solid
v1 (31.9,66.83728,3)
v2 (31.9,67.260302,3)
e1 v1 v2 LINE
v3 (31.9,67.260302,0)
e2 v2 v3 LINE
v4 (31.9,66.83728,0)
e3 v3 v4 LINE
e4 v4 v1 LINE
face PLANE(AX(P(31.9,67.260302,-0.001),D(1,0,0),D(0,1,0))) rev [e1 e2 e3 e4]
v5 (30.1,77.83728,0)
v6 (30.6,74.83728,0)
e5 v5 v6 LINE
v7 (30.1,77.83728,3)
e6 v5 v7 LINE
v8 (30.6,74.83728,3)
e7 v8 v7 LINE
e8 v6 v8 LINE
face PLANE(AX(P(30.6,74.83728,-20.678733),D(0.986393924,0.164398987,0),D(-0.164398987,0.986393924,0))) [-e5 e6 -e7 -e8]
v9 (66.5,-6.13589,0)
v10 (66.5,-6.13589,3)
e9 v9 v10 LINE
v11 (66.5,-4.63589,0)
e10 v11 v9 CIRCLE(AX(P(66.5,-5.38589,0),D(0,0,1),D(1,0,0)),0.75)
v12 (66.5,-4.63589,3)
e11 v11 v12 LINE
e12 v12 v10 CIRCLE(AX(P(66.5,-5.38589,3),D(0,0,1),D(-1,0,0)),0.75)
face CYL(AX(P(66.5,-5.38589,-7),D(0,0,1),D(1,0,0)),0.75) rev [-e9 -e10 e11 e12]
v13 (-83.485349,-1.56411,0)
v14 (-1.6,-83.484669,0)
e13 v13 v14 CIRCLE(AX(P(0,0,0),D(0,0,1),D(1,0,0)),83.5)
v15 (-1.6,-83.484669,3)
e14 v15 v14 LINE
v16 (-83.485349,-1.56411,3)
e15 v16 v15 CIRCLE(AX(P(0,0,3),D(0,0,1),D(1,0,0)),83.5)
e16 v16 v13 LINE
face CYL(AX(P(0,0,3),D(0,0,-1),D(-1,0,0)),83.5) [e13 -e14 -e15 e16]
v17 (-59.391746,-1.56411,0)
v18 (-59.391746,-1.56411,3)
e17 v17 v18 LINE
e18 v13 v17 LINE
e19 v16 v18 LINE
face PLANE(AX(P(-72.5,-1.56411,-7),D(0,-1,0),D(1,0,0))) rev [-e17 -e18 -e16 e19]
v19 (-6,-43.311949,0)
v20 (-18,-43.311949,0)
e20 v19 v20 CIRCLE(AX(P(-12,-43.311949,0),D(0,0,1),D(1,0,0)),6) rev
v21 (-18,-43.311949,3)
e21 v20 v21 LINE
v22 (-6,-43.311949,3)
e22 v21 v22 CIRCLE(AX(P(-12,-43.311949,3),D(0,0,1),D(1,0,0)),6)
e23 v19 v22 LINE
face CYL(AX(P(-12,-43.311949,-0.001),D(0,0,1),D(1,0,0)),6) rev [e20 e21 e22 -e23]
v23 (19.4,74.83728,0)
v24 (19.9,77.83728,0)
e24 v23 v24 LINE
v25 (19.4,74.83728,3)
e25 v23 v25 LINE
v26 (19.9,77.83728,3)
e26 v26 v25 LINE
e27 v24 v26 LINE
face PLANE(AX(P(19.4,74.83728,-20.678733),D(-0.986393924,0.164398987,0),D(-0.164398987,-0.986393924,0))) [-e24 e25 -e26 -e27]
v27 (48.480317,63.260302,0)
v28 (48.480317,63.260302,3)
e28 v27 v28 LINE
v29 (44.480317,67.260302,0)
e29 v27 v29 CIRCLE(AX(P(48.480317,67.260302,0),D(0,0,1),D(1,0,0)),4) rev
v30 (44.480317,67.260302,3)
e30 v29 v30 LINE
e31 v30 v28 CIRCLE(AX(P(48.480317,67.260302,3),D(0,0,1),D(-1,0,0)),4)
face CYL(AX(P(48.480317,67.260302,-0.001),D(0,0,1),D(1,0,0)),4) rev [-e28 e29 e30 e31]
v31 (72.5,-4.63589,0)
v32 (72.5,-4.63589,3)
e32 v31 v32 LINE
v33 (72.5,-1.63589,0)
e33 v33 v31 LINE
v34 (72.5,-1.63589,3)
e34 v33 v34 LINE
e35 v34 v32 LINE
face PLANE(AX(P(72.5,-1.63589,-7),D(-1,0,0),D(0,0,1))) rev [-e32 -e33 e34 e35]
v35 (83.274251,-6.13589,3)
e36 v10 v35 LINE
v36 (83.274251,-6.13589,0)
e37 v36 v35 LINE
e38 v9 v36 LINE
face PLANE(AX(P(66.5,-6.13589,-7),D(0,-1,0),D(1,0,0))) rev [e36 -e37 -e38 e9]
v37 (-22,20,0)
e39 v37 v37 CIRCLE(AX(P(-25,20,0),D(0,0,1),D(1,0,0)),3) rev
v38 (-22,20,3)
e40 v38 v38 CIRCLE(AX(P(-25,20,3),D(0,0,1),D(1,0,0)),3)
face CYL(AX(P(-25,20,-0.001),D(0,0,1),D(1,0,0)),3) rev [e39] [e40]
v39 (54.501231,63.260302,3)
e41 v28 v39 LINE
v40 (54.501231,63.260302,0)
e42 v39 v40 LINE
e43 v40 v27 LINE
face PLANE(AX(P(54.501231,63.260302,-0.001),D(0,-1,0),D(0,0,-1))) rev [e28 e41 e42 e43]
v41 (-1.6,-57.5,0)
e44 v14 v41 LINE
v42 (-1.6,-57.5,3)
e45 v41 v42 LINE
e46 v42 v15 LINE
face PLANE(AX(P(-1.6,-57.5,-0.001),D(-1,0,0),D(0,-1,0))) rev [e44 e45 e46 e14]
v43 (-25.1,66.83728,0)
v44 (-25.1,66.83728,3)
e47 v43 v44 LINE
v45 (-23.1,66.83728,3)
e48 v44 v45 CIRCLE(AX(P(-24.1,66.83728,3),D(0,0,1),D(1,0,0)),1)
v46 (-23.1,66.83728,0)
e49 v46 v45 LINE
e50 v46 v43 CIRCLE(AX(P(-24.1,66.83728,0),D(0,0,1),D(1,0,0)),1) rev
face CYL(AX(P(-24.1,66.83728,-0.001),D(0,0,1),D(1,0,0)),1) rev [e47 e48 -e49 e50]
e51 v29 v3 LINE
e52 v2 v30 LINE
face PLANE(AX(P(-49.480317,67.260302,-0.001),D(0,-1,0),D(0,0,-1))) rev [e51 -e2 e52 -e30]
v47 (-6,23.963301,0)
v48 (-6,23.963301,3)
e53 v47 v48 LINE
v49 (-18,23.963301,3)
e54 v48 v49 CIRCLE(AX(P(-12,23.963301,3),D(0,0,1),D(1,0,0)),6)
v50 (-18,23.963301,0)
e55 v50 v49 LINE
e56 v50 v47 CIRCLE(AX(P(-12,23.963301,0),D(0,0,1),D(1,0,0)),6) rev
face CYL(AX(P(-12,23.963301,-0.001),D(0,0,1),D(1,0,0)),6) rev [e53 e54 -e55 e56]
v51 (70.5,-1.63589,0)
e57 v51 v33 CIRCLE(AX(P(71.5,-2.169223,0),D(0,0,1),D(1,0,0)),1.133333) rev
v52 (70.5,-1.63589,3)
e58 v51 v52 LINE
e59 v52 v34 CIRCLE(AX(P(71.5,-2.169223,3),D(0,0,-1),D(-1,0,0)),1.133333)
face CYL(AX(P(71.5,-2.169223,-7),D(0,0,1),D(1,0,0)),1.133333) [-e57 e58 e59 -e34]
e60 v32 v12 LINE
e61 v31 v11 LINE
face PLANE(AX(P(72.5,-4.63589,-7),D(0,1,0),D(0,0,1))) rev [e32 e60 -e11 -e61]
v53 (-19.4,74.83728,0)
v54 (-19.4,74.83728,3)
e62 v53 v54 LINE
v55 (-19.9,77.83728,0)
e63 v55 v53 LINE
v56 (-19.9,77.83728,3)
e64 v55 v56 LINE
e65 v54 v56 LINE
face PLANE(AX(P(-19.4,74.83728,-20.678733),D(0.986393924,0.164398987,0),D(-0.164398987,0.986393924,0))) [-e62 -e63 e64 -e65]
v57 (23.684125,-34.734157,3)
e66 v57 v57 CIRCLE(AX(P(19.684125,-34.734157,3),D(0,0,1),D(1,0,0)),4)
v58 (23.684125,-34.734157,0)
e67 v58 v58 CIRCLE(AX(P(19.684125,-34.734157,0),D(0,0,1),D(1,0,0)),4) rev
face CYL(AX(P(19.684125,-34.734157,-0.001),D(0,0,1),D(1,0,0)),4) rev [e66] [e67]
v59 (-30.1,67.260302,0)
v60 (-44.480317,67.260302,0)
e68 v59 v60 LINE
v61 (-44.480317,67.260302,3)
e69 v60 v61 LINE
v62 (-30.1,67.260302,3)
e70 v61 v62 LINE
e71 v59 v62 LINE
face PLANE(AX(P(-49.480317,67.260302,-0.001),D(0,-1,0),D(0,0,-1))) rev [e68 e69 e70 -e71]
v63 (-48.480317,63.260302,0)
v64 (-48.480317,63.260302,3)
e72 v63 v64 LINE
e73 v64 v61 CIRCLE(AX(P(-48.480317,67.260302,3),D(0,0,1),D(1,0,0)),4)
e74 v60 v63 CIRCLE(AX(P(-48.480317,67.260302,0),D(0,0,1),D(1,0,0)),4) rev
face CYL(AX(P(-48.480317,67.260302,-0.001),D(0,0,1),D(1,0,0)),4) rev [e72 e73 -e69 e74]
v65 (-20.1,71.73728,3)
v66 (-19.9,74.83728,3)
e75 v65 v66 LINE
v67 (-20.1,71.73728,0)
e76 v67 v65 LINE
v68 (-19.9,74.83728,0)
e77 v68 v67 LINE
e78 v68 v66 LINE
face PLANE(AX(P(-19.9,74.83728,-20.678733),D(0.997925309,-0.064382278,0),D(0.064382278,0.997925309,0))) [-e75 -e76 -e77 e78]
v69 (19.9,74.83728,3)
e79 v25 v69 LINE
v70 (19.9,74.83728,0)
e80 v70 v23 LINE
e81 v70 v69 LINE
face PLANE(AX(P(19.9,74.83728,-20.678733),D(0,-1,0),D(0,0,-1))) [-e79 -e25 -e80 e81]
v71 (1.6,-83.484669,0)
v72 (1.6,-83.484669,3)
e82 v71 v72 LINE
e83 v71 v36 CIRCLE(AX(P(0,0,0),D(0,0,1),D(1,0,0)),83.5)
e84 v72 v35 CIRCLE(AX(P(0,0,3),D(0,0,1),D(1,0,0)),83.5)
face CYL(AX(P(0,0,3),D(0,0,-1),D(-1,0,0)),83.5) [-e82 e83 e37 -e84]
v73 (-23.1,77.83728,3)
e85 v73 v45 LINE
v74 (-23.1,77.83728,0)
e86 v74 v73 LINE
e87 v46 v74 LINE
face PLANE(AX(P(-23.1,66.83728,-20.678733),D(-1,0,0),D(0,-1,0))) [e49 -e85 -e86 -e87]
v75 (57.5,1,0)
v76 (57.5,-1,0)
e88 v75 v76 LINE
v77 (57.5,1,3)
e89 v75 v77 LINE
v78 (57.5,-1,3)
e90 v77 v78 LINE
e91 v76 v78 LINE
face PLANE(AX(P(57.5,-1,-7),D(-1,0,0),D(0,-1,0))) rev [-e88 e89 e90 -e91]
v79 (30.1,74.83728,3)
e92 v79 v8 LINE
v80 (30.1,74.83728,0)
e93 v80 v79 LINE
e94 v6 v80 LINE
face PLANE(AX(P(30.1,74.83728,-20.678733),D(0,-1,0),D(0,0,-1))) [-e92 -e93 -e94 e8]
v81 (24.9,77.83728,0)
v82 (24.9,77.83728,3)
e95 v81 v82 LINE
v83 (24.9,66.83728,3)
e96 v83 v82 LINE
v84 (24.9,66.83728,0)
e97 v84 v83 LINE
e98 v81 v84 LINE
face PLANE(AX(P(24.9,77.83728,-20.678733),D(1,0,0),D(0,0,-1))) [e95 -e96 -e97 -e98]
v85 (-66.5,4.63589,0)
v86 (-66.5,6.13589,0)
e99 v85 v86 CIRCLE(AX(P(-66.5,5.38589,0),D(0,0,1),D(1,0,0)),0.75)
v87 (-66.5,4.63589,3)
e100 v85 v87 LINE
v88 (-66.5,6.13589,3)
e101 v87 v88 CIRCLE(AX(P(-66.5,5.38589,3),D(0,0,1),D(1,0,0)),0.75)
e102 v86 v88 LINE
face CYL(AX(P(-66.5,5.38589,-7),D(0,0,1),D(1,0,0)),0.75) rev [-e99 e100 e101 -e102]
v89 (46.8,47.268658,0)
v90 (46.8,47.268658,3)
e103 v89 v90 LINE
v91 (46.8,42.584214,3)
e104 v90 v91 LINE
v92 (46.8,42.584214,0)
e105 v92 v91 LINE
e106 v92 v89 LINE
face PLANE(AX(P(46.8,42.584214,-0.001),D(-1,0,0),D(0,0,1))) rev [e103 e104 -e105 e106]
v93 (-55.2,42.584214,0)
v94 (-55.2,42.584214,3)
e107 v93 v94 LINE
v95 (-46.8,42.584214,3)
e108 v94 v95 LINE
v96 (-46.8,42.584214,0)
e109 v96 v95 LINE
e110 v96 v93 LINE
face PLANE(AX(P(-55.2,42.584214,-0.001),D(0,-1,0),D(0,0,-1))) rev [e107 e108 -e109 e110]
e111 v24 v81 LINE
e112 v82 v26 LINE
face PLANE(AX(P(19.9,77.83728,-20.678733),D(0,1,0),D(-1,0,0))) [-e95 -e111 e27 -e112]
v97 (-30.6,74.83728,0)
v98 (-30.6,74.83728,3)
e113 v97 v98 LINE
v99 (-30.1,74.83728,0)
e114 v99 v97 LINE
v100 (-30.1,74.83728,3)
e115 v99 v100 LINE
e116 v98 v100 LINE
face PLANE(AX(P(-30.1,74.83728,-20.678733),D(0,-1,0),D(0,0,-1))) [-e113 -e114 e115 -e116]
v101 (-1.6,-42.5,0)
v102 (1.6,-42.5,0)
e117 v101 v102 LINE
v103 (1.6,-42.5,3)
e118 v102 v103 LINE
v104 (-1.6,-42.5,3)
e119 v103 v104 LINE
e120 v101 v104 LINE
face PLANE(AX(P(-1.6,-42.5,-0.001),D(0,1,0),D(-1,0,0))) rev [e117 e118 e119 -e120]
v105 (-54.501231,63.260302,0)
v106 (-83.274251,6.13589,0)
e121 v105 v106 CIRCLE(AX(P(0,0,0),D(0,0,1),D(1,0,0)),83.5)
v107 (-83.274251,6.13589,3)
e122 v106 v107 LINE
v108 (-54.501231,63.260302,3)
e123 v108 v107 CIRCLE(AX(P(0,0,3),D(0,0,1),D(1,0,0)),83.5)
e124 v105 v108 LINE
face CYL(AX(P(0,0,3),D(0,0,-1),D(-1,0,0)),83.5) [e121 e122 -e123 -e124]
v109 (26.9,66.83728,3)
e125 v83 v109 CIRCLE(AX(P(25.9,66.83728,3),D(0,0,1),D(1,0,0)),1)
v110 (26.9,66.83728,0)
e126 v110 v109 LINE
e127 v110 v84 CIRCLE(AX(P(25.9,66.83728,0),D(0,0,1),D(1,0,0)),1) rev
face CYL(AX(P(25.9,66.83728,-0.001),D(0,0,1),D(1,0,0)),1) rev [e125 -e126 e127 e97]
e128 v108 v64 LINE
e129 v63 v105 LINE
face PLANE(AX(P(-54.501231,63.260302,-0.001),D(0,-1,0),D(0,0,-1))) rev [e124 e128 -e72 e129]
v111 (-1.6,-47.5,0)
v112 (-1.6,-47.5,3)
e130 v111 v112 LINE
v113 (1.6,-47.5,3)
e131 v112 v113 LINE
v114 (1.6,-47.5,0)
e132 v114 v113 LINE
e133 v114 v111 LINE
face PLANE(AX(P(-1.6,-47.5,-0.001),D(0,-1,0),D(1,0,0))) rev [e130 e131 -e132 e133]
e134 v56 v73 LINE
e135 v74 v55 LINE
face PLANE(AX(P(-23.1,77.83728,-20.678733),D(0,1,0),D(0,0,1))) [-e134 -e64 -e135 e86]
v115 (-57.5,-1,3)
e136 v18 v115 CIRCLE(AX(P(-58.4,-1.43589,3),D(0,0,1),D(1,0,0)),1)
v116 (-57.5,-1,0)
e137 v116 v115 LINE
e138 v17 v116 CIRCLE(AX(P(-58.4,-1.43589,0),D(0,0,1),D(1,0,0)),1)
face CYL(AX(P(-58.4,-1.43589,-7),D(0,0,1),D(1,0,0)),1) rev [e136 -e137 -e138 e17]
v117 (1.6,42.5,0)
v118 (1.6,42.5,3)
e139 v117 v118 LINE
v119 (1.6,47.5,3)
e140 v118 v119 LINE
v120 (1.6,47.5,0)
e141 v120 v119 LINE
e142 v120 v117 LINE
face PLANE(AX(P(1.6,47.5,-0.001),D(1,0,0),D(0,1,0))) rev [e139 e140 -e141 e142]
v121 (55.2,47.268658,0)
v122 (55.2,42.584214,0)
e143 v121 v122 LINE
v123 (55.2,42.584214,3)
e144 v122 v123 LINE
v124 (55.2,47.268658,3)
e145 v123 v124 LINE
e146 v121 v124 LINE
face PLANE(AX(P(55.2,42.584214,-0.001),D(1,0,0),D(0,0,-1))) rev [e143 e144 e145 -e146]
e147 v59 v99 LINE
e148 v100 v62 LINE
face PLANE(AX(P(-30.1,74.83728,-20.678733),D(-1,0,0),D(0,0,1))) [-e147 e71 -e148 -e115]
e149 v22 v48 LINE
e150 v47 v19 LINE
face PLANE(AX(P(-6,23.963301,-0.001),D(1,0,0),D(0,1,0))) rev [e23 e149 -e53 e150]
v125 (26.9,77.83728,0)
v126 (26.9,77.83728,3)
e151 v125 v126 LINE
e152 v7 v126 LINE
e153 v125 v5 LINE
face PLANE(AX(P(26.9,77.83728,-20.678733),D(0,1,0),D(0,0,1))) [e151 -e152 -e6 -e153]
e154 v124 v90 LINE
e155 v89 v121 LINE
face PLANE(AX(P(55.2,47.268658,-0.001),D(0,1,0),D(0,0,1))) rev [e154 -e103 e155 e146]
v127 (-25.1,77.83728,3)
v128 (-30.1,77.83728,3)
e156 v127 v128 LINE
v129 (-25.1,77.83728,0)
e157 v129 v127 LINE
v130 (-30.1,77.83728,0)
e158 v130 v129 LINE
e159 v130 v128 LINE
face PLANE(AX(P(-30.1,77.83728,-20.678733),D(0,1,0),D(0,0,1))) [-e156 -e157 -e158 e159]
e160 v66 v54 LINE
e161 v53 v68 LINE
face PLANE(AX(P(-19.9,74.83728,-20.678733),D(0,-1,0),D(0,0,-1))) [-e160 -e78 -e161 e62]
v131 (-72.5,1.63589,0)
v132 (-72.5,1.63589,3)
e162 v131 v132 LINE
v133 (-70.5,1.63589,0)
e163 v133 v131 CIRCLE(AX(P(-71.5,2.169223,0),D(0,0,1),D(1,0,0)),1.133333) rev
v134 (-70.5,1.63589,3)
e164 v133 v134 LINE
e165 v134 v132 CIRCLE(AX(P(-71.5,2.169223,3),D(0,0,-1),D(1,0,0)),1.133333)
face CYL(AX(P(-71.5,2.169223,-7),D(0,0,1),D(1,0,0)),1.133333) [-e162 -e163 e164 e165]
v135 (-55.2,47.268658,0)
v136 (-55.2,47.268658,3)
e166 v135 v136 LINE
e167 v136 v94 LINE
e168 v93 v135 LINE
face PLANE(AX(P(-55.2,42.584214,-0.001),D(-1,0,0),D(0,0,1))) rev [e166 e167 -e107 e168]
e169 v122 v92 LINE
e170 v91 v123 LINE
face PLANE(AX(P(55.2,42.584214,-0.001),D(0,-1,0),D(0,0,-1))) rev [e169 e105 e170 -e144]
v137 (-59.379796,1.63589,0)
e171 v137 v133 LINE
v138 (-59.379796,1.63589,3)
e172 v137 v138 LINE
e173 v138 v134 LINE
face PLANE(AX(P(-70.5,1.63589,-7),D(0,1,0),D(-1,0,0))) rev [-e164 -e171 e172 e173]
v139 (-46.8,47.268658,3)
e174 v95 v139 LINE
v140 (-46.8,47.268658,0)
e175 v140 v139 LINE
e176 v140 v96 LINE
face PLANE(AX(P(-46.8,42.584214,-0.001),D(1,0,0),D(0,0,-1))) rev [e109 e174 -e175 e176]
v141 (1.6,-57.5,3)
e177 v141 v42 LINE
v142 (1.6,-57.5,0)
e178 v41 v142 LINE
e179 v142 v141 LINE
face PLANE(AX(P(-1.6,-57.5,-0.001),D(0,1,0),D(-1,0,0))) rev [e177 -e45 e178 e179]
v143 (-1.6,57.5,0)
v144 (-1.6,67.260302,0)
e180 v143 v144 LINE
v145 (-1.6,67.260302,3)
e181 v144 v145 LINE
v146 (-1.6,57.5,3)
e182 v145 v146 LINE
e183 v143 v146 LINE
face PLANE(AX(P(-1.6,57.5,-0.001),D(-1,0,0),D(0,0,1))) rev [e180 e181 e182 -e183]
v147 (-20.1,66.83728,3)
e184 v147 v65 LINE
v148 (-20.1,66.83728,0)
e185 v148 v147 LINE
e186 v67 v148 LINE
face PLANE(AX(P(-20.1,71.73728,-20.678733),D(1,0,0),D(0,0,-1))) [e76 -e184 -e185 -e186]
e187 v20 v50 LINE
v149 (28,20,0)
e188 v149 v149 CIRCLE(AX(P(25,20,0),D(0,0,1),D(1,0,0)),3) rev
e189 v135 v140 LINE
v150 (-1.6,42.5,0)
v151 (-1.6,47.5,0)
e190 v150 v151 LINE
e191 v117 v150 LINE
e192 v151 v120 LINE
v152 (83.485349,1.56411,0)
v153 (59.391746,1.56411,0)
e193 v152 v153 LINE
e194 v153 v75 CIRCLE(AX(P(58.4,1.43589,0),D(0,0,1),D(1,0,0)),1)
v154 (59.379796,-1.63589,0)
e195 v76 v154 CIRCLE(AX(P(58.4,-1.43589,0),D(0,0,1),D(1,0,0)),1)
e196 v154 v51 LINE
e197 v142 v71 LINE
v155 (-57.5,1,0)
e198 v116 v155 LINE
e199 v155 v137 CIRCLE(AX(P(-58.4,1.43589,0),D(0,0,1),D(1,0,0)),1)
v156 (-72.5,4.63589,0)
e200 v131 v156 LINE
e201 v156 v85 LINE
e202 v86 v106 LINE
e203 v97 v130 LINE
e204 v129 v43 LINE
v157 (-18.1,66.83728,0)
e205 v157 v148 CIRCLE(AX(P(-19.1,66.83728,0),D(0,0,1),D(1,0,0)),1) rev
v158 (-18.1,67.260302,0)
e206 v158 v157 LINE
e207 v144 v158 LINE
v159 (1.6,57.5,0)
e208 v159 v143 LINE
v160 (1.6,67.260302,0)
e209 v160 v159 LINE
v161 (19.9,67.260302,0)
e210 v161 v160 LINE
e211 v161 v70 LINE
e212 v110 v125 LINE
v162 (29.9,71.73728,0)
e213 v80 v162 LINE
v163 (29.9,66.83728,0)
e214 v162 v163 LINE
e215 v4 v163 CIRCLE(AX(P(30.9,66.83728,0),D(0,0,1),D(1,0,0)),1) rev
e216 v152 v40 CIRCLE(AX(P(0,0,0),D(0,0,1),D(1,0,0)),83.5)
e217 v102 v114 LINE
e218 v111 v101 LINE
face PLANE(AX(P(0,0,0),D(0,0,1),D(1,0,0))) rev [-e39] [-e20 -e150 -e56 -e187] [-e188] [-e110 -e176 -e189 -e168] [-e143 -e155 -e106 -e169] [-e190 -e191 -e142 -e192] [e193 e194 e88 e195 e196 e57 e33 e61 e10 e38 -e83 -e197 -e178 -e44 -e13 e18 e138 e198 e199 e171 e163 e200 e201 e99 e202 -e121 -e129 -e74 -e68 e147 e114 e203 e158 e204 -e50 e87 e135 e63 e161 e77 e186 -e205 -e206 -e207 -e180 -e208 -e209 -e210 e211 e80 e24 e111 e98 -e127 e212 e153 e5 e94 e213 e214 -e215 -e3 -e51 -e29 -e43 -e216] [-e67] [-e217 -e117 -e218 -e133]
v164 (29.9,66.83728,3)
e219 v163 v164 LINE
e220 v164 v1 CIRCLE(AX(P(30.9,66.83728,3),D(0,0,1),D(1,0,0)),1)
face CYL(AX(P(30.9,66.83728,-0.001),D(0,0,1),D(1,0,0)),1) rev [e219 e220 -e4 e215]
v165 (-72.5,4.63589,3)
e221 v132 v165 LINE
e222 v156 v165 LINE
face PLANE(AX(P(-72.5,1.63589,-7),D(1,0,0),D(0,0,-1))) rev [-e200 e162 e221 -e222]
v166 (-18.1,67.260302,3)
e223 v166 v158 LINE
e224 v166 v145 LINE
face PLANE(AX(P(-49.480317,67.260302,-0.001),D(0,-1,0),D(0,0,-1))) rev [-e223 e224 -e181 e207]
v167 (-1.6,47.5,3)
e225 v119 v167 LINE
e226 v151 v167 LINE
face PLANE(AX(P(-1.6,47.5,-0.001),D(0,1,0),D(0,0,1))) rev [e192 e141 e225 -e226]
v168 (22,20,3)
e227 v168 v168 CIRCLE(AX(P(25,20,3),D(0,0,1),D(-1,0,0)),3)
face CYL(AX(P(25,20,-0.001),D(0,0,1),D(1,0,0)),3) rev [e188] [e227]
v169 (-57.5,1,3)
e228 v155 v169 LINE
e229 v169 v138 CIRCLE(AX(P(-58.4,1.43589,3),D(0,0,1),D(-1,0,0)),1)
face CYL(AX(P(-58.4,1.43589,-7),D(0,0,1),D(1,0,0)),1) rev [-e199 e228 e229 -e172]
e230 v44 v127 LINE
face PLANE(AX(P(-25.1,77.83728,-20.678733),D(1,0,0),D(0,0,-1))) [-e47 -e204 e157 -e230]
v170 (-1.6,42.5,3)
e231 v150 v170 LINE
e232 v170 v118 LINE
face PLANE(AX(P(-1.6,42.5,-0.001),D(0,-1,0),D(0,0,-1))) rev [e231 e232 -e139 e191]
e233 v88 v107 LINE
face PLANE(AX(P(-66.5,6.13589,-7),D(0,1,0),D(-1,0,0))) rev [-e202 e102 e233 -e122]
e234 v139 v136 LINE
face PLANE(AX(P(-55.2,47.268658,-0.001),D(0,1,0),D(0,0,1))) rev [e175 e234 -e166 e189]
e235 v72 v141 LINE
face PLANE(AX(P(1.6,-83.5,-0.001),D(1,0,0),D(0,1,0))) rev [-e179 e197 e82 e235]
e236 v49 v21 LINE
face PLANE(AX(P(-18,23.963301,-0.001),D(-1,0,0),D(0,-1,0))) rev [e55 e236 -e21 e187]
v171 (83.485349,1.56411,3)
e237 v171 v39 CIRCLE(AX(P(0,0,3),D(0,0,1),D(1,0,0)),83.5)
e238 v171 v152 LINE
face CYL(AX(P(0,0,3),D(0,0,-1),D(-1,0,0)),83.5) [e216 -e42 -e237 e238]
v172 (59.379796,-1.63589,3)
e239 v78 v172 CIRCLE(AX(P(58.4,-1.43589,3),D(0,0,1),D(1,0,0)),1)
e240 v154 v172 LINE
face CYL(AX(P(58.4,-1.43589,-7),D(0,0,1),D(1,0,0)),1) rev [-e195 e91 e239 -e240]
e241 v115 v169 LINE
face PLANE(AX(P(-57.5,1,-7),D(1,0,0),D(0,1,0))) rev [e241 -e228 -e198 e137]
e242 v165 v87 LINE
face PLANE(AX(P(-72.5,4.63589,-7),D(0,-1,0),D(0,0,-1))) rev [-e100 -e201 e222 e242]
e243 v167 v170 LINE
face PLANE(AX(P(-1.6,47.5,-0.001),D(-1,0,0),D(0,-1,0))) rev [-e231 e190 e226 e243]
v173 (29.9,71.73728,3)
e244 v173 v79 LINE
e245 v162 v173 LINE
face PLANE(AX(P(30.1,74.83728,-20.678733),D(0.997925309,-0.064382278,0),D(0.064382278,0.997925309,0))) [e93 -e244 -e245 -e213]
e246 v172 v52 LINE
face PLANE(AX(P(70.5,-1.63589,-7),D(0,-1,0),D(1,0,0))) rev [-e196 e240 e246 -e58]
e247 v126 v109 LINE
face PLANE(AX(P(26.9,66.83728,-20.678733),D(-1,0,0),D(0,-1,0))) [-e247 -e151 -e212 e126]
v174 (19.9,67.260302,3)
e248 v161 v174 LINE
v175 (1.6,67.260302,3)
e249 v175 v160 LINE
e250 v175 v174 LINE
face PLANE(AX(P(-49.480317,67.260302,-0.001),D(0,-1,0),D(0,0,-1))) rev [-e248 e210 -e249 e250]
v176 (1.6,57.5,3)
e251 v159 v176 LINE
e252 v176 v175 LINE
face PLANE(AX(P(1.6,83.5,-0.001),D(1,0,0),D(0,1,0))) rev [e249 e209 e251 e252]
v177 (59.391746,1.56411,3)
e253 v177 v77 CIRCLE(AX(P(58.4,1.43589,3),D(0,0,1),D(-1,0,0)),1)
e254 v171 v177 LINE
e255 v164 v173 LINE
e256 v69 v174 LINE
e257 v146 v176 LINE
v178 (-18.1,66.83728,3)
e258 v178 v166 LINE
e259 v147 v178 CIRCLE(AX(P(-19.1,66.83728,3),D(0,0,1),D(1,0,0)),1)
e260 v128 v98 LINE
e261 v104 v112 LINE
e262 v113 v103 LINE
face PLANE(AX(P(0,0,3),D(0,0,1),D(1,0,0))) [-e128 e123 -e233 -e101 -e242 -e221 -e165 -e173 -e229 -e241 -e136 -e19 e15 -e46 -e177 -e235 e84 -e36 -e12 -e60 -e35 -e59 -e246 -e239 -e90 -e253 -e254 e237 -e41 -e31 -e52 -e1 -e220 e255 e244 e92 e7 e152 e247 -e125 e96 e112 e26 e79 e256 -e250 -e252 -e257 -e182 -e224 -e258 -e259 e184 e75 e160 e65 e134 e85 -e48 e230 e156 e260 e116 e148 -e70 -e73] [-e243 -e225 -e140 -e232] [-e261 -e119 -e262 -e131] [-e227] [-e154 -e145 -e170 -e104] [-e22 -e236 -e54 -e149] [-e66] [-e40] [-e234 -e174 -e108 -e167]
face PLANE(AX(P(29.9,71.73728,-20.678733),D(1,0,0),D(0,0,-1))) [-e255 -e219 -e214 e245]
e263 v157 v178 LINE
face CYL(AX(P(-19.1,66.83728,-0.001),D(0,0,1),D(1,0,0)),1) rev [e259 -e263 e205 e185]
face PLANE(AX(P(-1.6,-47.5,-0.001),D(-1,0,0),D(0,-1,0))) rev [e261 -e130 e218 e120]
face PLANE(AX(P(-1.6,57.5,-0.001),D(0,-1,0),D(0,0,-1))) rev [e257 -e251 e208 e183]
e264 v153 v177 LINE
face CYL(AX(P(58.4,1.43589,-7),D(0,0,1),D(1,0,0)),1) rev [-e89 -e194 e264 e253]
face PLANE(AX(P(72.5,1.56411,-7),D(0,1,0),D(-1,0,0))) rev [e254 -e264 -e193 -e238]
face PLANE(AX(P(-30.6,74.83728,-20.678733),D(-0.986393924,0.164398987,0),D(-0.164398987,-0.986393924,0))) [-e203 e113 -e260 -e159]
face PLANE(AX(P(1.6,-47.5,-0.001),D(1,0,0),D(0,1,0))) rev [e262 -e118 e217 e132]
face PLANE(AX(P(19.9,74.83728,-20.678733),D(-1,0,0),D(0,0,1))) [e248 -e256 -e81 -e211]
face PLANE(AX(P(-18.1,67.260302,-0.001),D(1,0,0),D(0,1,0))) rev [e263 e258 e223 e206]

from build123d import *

# Parameters (mm, degrees)
SKETCH1_R                     = 83.5
BOSS_EXTRUDE1_DEPTH           = 3
FACE_FLATTENING_REACH         = 120.125
SKETCH10_W                    = 98.960633138
SKETCH10_H                    = 16.23969765
SIDE_RIB_SLOT_DEPTH           = 10
RIB_TAB_CLEARANCE_SLOT_REACH  = 120.125
SKETCH5_W                     = 3.2
SKETCH5_H                     = 5
SKETCH5_H_2                   = 26
SIDE_RIB_SLOT_PATTERN_COUNT   = 2
EYE_PLATE_SLOTS_REACH         = 120.104
SKETCH3_R                     = 3
SKETCH3_W                     = 8.4
SKETCH3_H                     = 4.684444021
FACE_START                    = -3
FACE_PLATE_TABS_OUTLINE_W     = 2
FACE_PLATE_TABS_OUTLINE_H     = 4.476977338
FACE_PLATE_TABS_DEPTH         = 3
SKETCH11_W                    = 2
SKETCH11_H                    = 4.476977338
FACE_PLATE_TAB_RELIEF_DEPTH   = 3
ACTUATOR_CLEARANCE_SLOT_REACH = 120.104
SKETCH4_R                     = 4
EYE_PLATE_RELIEF_REACH        = 120.104


# Read off the part's stored shape, not the designer's step: face plate tabs
with BuildPart() as part:
    # Sketch1 → Boss-Extrude1 (new body)
    with BuildSketch(Plane.XY):
        Circle(SKETCH1_R)
    extrude(amount=BOSS_EXTRUDE1_DEPTH)

    # Sketch10 → face flattening (cut, up to next)
    with BuildSketch(Plane.XY.offset(3), mode=Mode.PRIVATE) as face_flattening_sk1:
        with Locations((0, 75.380151175)):
            Rectangle(SKETCH10_W, SKETCH10_H)
    face_flattening_tool1 = extrude(face_flattening_sk1.sketch, amount=-FACE_FLATTENING_REACH, mode=Mode.PRIVATE) & part.part
    add(face_flattening_tool1.solids().sort_by_distance((0, 75.380151, 3))[0], mode=Mode.SUBTRACT)

    # Sketch7 → side rib slot (cut)
    with BuildSketch(Plane.XY.offset(3)):
        with BuildLine():
            Line((-72.5, 1.635889894), (-72.5, 4.635889894))
            Line((-72.5, 4.635889894), (-66.5, 4.635889894))
            ThreePointArc((-66.5, 4.635889894), (-65.75, 5.385889894), (-66.5, 6.135889894))
            Line((-66.5, 6.135889894), (-87.5, 6.135889894))
            Line((-87.5, 6.135889894), (-87.5, -1.564110106))
            Line((-87.5, -1.564110106), (-72.5, -1.564110106))
            Line((-72.5, -1.564110106), (-59.391745722, -1.564110106))
            ThreePointArc((-59.391745722, -1.564110106), (-58.11423896, -2.394190801), (-57.5, -1))
            Line((-57.5, -1), (-57.5, 1))
            ThreePointArc((-57.5, 1), (-58.079561495, 2.383159214), (-59.379795897, 1.635889894))
            Line((-59.379795897, 1.635889894), (-70.5, 1.635889894))
            ThreePointArc((-70.5, 1.635889894), (-71.5, 1.035889894), (-72.5, 1.635889894))
        make_face()
    side_rib_slot = extrude(amount=-SIDE_RIB_SLOT_DEPTH, mode=Mode.SUBTRACT)

    # Sketch5 → rib tab clearance slot (cut, up to next)
    with BuildSketch(Plane.XY.offset(3), mode=Mode.PRIVATE) as rib_tab_clearance_slot_sk1:
        with Locations((0, 45)):
            Rectangle(SKETCH5_W, SKETCH5_H)
    rib_tab_clearance_slot_tool1 = extrude(rib_tab_clearance_slot_sk1.sketch, amount=-RIB_TAB_CLEARANCE_SLOT_REACH, mode=Mode.PRIVATE) & part.part
    # Sketch5 → rib tab clearance slot (cut, up to next)
    with BuildSketch(Plane.XY.offset(3), mode=Mode.PRIVATE) as rib_tab_clearance_slot_sk2:
        with Locations((0, 70.5)):
            Rectangle(SKETCH5_W, SKETCH5_H_2)
    rib_tab_clearance_slot_tool2 = extrude(rib_tab_clearance_slot_sk2.sketch, amount=-RIB_TAB_CLEARANCE_SLOT_REACH, mode=Mode.PRIVATE) & part.part
    # Sketch5 → rib tab clearance slot (cut, up to next)
    with BuildSketch(Plane.XY.offset(3), mode=Mode.PRIVATE) as rib_tab_clearance_slot_sk3:
        with Locations((0, -70.5)):
            Rectangle(SKETCH5_W, SKETCH5_H_2)
    rib_tab_clearance_slot_tool3 = extrude(rib_tab_clearance_slot_sk3.sketch, amount=-RIB_TAB_CLEARANCE_SLOT_REACH, mode=Mode.PRIVATE) & part.part
    # Sketch5 → rib tab clearance slot (cut, up to next)
    with BuildSketch(Plane.XY.offset(3), mode=Mode.PRIVATE) as rib_tab_clearance_slot_sk4:
        with Locations((0, -45)):
            Rectangle(SKETCH5_W, SKETCH5_H)
    rib_tab_clearance_slot_tool4 = extrude(rib_tab_clearance_slot_sk4.sketch, amount=-RIB_TAB_CLEARANCE_SLOT_REACH, mode=Mode.PRIVATE) & part.part
    add(rib_tab_clearance_slot_tool1.solids().sort_by_distance((0, 45, 3))[0], mode=Mode.SUBTRACT)
    add(rib_tab_clearance_slot_tool2.solids().sort_by_distance((0, 70.5, 3))[0], mode=Mode.SUBTRACT)
    add(rib_tab_clearance_slot_tool3.solids().sort_by_distance((0, -70.5, 3))[0], mode=Mode.SUBTRACT)
    add(rib_tab_clearance_slot_tool4.solids().sort_by_distance((0, -45, 3))[0], mode=Mode.SUBTRACT)

    # side rib slot pattern: side rib slot ×2 about axis
    side_rib_slot_pattern_axis = Axis((0, 0, 0), (0, 0, 1))
    for i in range(1, SIDE_RIB_SLOT_PATTERN_COUNT):
        add(side_rib_slot.rotate(side_rib_slot_pattern_axis, i * 360 / SIDE_RIB_SLOT_PATTERN_COUNT), mode=Mode.SUBTRACT)

    # Sketch3 → eye plate slots (cut, up to next)
    with BuildSketch(Plane.XY.offset(3), mode=Mode.PRIVATE) as eye_plate_slots_sk1:
        with Locations((-25, 20)):
            Circle(SKETCH3_R)
    eye_plate_slots_tool1 = extrude(eye_plate_slots_sk1.sketch, amount=-EYE_PLATE_SLOTS_REACH, mode=Mode.PRIVATE) & part.part
    # Sketch3 → eye plate slots (cut, up to next)
    with BuildSketch(Plane.XY.offset(3), mode=Mode.PRIVATE) as eye_plate_slots_sk2:
        with Locations((25, 20)):
            Circle(SKETCH3_R)
    eye_plate_slots_tool2 = extrude(eye_plate_slots_sk2.sketch, amount=-EYE_PLATE_SLOTS_REACH, mode=Mode.PRIVATE) & part.part
    # Sketch3 → eye plate slots (cut, up to next)
    with BuildSketch(Plane.XY.offset(3), mode=Mode.PRIVATE) as eye_plate_slots_sk3:
        with Locations((-51, 44.926435594)):
            Rectangle(SKETCH3_W, SKETCH3_H)
    eye_plate_slots_tool3 = extrude(eye_plate_slots_sk3.sketch, amount=-EYE_PLATE_SLOTS_REACH, mode=Mode.PRIVATE) & part.part
    # Sketch3 → eye plate slots (cut, up to next)
    with BuildSketch(Plane.XY.offset(3), mode=Mode.PRIVATE) as eye_plate_slots_sk4:
        with Locations((51, 44.926435594)):
            Rectangle(SKETCH3_W, SKETCH3_H)
    eye_plate_slots_tool4 = extrude(eye_plate_slots_sk4.sketch, amount=-EYE_PLATE_SLOTS_REACH, mode=Mode.PRIVATE) & part.part
    add(eye_plate_slots_tool1.solids().sort_by_distance((-25, 20, 3))[0], mode=Mode.SUBTRACT)
    add(eye_plate_slots_tool2.solids().sort_by_distance((25, 20, 3))[0], mode=Mode.SUBTRACT)
    add(eye_plate_slots_tool3.solids().sort_by_distance((-51, 44.926436, 3))[0], mode=Mode.SUBTRACT)
    add(eye_plate_slots_tool4.solids().sort_by_distance((51, 44.926436, 3))[0], mode=Mode.SUBTRACT)

    # face plate tabs outline → face plate tabs (add)
    with BuildSketch(Plane.XY.offset(3).offset(FACE_START)):
        Polygon((24.9, 67.26030235), (24.9, 77.837279688), (19.9, 77.837279688), (19.4, 74.837279688), (19.9, 74.837279688), (19.9, 71.737279688), (17.9, 71.737279688), (17.9, 67.26030235), align=None)
        with Locations((32.9, 69.498791019)):
            Rectangle(FACE_PLATE_TABS_OUTLINE_W, FACE_PLATE_TABS_OUTLINE_H)
        Polygon((26.9, 77.837279688), (26.9, 67.26030235), (29.9, 67.26030235), (29.9, 71.737279688), (30.1, 74.837279688), (30.6, 74.837279688), (30.1, 77.837279688), align=None)
        Polygon((-25.1, 67.26030235), (-25.1, 77.837279688), (-30.1, 77.837279688), (-30.6, 74.837279688), (-30.1, 74.837279688), (-30.1, 71.737279688), (-32.1, 71.737279688), (-32.1, 67.26030235), align=None)
        with Locations((-17.1, 69.498791019)):
            Rectangle(FACE_PLATE_TABS_OUTLINE_W, FACE_PLATE_TABS_OUTLINE_H)
        Polygon((-23.1, 77.837279688), (-23.1, 67.26030235), (-20.1, 67.26030235), (-20.1, 71.737279688), (-19.9, 74.837279688), (-19.4, 74.837279688), (-19.9, 77.837279688), align=None)
    extrude(amount=FACE_PLATE_TABS_DEPTH)

    # Sketch11 → face plate tab relief (cut)
    with BuildSketch(Plane.XY.offset(3).offset(FACE_START)):
        with BuildLine():
            Line((29.9, 66.837279688), (29.9, 67.26030235))
            Line((29.9, 67.26030235), (31.9, 71.737279688))
            Line((31.9, 71.737279688), (33.9, 71.737279688))
            Line((33.9, 71.737279688), (33.9, 67.26030235))
            Line((33.9, 67.26030235), (31.9, 67.26030235))
            Line((31.9, 67.26030235), (31.9, 66.837279688))
            ThreePointArc((31.9, 66.837279688), (30.9, 65.837279688), (29.9, 66.837279688))
        make_face()
        with BuildLine():
            Line((24.9, 66.837279688), (24.9, 67.26030235))
            Line((24.9, 67.26030235), (26.9, 67.26030235))
            Line((26.9, 67.26030235), (26.9, 66.837279688))
            ThreePointArc((26.9, 66.837279688), (25.9, 65.837279688), (24.9, 66.837279688))
        make_face()
        with Locations((18.9, 69.498791019)):
            Rectangle(SKETCH11_W, SKETCH11_H)
        with BuildLine():
            Line((-25.1, 66.837279688), (-25.1, 67.26030235))
            Line((-25.1, 67.26030235), (-23.1, 67.26030235))
            Line((-23.1, 67.26030235), (-23.1, 66.837279688))
            ThreePointArc((-23.1, 66.837279688), (-24.1, 65.837279688), (-25.1, 66.837279688))
        make_face()
        with BuildLine():
            Line((-20.1, 66.837279688), (-20.1, 67.26030235))
            Line((-20.1, 67.26030235), (-18.1, 71.737279688))
            Line((-18.1, 71.737279688), (-16.1, 71.737279688))
            Line((-16.1, 71.737279688), (-16.1, 67.26030235))
            Line((-16.1, 67.26030235), (-18.1, 67.26030235))
            Line((-18.1, 67.26030235), (-18.1, 66.837279688))
            ThreePointArc((-18.1, 66.837279688), (-19.1, 65.837279688), (-20.1, 66.837279688))
        make_face()
        with Locations((-31.1, 69.498791019)):
            Rectangle(SKETCH11_W, SKETCH11_H)
    extrude(amount=FACE_PLATE_TAB_RELIEF_DEPTH, mode=Mode.SUBTRACT)

    # Sketch4 → actuator clearance slot (cut, up to next)
    with BuildSketch(Plane.XY.offset(3), mode=Mode.PRIVATE) as actuator_clearance_slot_sk1:
        with Locations((19.684125428, -34.734157019)):
            Circle(SKETCH4_R)
    actuator_clearance_slot_tool1 = extrude(actuator_clearance_slot_sk1.sketch, amount=-ACTUATOR_CLEARANCE_SLOT_REACH, mode=Mode.PRIVATE) & part.part
    # Sketch4 → actuator clearance slot (cut, up to next)
    with BuildSketch(Plane.XY.offset(3), mode=Mode.PRIVATE) as actuator_clearance_slot_sk2:
        with BuildLine():
            Line((-6, 23.963301095), (-6, -43.311948564))
            ThreePointArc((-6, -43.311948564), (-12, -49.311948564), (-18, -43.311948564))
            Line((-18, -43.311948564), (-18, 23.963301095))
            ThreePointArc((-18, 23.963301095), (-12, 29.963301095), (-6, 23.963301095))
        make_face()
    actuator_clearance_slot_tool2 = extrude(actuator_clearance_slot_sk2.sketch, amount=-ACTUATOR_CLEARANCE_SLOT_REACH, mode=Mode.PRIVATE) & part.part
    add(actuator_clearance_slot_tool1.solids().sort_by_distance((19.684125, -34.734157, 3))[0], mode=Mode.SUBTRACT)
    add(actuator_clearance_slot_tool2.solids().sort_by_distance((-12, -9.674324, 3))[0], mode=Mode.SUBTRACT)

    # Sketch12 → eye plate relief (cut, up to next)
    with BuildSketch(Plane.XY.offset(3), mode=Mode.PRIVATE) as eye_plate_relief_sk1:
        with BuildLine():
            Line((54.501230688, 63.26030235), (48.480316569, 63.26030235))
            ThreePointArc((48.480316569, 63.26030235), (45.651889444, 64.431875226), (44.480316569, 67.26030235))
            Line((44.480316569, 67.26030235), (54.501230688, 67.26030235))
            Line((54.501230688, 67.26030235), (54.501230688, 63.26030235))
        make_face()
    eye_plate_relief_tool1 = extrude(eye_plate_relief_sk1.sketch, amount=-EYE_PLATE_RELIEF_REACH, mode=Mode.PRIVATE) & part.part
    # Sketch12 → eye plate relief (cut, up to next)
    with BuildSketch(Plane.XY.offset(3), mode=Mode.PRIVATE) as eye_plate_relief_sk2:
        with BuildLine():
            Line((-54.501230688, 67.26030235), (-44.480316569, 67.26030235))
            ThreePointArc((-44.480316569, 67.26030235), (-45.651889444, 64.431875226), (-48.480316569, 63.26030235))
            Line((-48.480316569, 63.26030235), (-54.501230688, 63.26030235))
            Line((-54.501230688, 63.26030235), (-54.501230688, 67.26030235))
        make_face()
    eye_plate_relief_tool2 = extrude(eye_plate_relief_sk2.sketch, amount=-EYE_PLATE_RELIEF_REACH, mode=Mode.PRIVATE) & part.part
    add(eye_plate_relief_tool1.solids().sort_by_distance((49.876481, 65.36397, 3))[0], mode=Mode.SUBTRACT)
    add(eye_plate_relief_tool2.solids().sort_by_distance((-49.876481, 65.36397, 3))[0], mode=Mode.SUBTRACT)


solid = part.part
